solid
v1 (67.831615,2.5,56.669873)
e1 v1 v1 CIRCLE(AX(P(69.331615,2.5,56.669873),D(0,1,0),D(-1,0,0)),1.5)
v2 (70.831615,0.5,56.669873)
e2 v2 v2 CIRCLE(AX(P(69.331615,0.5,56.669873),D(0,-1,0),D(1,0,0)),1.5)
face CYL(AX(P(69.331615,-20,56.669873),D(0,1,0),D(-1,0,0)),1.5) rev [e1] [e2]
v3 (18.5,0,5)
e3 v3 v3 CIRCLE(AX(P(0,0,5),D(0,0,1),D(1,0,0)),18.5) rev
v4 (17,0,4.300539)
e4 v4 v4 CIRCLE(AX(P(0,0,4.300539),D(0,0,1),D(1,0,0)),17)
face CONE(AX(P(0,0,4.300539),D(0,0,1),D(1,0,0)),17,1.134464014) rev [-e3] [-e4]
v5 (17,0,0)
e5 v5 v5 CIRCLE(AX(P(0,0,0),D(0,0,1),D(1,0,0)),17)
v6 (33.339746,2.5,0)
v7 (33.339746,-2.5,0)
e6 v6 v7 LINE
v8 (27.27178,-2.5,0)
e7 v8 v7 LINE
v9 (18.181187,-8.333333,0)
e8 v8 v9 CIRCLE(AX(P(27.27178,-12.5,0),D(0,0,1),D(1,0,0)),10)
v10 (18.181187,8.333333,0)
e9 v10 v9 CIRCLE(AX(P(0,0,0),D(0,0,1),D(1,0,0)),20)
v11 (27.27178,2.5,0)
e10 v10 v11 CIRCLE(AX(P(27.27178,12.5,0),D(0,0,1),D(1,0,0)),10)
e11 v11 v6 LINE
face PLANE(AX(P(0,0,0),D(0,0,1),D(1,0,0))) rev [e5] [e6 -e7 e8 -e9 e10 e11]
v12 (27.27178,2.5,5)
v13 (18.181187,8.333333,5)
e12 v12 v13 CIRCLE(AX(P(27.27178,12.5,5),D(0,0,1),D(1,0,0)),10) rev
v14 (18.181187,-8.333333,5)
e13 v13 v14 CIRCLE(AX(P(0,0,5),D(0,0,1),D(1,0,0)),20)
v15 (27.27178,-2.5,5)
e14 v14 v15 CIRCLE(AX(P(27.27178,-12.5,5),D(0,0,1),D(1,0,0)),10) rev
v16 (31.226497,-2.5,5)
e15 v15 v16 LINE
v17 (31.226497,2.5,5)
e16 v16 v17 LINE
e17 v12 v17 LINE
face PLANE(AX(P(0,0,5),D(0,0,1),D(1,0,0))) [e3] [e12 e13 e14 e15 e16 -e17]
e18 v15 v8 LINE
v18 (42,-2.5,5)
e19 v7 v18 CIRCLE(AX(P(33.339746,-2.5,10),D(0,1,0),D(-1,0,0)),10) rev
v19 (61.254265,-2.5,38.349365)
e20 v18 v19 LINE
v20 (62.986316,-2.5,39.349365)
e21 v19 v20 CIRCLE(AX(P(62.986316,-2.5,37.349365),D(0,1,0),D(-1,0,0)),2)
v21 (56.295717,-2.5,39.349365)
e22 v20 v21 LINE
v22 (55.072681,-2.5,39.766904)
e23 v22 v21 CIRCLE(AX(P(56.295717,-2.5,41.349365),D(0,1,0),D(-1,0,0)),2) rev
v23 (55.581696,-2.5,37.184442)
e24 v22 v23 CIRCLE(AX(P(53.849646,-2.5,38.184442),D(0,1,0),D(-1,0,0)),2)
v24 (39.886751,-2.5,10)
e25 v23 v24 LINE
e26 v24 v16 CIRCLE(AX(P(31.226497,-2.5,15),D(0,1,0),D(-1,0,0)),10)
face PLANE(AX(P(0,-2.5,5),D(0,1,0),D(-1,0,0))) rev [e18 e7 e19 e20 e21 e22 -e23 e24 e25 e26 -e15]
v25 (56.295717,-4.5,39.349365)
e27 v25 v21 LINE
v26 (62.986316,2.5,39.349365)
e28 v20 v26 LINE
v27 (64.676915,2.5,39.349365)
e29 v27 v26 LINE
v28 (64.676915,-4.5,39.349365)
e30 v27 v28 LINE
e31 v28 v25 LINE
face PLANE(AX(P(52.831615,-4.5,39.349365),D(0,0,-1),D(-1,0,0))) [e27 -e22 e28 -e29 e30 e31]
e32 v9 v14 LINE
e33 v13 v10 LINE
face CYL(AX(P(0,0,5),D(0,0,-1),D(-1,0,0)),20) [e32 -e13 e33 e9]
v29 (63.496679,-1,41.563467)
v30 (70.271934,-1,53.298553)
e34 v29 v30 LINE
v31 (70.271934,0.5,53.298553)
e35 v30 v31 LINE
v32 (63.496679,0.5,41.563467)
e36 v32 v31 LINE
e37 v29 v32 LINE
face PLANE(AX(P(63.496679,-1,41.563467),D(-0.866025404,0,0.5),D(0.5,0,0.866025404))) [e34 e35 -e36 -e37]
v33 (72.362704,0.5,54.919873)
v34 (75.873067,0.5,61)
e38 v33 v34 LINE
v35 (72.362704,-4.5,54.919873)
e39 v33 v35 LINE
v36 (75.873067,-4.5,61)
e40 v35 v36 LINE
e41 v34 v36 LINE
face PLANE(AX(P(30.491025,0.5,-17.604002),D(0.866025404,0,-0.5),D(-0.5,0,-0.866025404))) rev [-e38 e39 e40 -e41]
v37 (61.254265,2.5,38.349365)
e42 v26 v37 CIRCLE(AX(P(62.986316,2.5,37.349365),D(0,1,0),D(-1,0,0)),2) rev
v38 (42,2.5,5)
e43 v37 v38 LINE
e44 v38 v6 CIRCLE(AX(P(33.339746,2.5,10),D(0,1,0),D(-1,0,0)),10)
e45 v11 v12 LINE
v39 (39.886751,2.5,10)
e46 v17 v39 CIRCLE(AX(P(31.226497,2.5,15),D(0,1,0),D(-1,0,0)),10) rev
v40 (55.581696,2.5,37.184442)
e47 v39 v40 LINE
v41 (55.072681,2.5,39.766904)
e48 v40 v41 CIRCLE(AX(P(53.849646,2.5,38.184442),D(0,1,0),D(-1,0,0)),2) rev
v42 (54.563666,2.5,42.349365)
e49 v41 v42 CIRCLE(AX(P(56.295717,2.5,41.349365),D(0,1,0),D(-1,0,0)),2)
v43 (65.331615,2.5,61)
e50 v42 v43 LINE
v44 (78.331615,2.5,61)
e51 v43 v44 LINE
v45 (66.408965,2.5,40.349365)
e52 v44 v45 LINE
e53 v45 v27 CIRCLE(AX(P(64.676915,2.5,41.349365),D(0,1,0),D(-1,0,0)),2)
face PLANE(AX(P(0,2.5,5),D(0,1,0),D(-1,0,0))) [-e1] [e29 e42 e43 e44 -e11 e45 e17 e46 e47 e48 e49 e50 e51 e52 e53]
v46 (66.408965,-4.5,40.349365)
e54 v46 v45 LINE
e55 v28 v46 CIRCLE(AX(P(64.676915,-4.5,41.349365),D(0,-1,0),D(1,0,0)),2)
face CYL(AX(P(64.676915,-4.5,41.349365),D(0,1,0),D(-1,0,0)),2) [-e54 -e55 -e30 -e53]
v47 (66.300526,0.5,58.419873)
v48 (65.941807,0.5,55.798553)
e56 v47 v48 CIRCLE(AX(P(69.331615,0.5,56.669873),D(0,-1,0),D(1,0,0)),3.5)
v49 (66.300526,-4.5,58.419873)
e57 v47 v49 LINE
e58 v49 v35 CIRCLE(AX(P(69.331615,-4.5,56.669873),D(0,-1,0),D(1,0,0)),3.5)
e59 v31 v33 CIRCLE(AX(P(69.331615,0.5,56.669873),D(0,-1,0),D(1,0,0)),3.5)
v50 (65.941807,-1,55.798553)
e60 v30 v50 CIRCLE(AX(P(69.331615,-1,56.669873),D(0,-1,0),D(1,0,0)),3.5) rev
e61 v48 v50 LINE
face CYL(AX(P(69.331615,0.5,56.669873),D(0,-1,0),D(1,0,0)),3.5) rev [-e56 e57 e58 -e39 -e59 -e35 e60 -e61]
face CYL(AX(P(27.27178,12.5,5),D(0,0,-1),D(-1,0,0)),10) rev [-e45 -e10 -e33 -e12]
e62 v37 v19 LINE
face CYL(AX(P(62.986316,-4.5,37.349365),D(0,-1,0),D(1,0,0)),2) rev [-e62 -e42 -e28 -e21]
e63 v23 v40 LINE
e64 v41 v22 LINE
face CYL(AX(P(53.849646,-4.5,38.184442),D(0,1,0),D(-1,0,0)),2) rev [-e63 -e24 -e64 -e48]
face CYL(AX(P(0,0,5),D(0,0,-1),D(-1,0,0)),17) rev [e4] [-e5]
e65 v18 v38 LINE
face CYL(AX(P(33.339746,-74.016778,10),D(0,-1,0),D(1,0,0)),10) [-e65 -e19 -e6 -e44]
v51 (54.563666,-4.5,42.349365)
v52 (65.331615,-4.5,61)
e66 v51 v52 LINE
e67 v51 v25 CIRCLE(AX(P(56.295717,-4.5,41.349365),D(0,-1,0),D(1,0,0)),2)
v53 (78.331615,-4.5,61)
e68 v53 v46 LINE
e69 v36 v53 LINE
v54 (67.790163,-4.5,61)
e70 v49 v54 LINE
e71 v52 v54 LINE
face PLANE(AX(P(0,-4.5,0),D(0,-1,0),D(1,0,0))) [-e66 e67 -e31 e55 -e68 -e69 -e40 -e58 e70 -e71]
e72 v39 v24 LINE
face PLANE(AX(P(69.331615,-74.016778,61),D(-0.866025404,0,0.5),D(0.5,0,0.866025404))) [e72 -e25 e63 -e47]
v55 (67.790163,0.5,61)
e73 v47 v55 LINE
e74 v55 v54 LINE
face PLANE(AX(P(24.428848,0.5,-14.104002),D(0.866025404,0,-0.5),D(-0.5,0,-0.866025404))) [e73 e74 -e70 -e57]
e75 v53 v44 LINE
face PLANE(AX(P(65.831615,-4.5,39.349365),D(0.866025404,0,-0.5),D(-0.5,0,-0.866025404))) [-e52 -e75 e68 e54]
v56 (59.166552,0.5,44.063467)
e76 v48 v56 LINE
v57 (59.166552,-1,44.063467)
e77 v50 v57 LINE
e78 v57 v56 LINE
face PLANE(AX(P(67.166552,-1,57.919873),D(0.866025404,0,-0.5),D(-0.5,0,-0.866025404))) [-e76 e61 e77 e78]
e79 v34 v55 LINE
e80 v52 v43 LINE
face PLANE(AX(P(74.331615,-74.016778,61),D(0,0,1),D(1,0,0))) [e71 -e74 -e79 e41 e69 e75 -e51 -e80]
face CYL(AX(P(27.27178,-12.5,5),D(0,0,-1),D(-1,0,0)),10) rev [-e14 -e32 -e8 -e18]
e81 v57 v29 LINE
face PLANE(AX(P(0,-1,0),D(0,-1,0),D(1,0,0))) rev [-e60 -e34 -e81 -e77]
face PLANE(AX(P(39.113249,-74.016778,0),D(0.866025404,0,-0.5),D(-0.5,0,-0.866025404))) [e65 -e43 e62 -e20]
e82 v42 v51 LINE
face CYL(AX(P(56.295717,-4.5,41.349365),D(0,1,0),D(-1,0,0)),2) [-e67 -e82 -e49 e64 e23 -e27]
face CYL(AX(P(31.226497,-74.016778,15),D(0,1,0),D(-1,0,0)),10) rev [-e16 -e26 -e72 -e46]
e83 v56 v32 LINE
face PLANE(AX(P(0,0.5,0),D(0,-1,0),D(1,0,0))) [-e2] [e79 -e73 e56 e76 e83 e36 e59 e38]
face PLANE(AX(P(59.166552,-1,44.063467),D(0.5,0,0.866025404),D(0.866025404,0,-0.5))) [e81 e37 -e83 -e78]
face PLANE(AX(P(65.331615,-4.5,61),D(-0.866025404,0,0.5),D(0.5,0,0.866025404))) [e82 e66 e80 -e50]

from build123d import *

# Parameters (mm, degrees)
BOSS_EXTRUDE1_DEPTH = 5
CHAMFER2_SIZE       = 1.5
CHAMFER2_SIZE2      = 0.699461487
FILLET1_R           = 10
BOSS_EXTRUDE2_DEPTH = 5
BOSS_EXTRUDE3_DEPTH = 7
CUT_EXTRUDE1_DEPTH  = 5
CUT_EXTRUDE2_DEPTH  = 1.5
SKETCH11_R          = 1.5
CUT_EXTRUDE3_DEPTH  = 102.79927269
FILLET2_R           = 10
FILLET3_R           = 2
FILLET4_R           = 2


with BuildPart() as part:
    # Sketch1 → Boss-Extrude1 (new body)
    with BuildSketch(Plane.XY):
        with BuildLine():
            ThreePointArc((16.815171721, -2.5), (-17, 0), (16.815171721, 2.5))
            Line((16.815171721, 2.5), (19.843134833, 2.5))
            ThreePointArc((19.843134833, 2.5), (-20, 0), (19.843134833, -2.5))
            Line((19.843134833, -2.5), (16.815171721, -2.5))
        make_face()
        with BuildLine():
            Line((19.843134833, 2.5), (16.815171721, 2.5))
            ThreePointArc((16.815171721, 2.5), (16.953729962, 1.253411494), (17, 0))
            ThreePointArc((17, 0), (16.953729962, -1.253411494), (16.815171721, -2.5))
            Line((16.815171721, -2.5), (19.843134833, -2.5))
            ThreePointArc((19.843134833, -2.5), (19.960745185, -1.252458251), (20, 0))
            ThreePointArc((20, 0), (19.960745185, 1.252458251), (19.843134833, 2.5))
        make_face()
        with BuildLine():
            Line((37, 2.5), (19.843134833, 2.5))
            ThreePointArc((19.843134833, 2.5), (19.960745185, 1.252458251), (20, 0))
            ThreePointArc((20, 0), (19.960745185, -1.252458251), (19.843134833, -2.5))
            Line((19.843134833, -2.5), (37, -2.5))
            Line((37, -2.5), (37, 2.5))
        make_face()
    extrude(amount=BOSS_EXTRUDE1_DEPTH)

    # Chamfer2
    chamfer2_edges = [part.edges().sort_by_distance(p)[0] for p in [
        (-16.815171721, -2.5, 5),
    ]]
    chamfer2_side = [part.faces().sort_by_distance(p)[0] for p in [
        (-17.503948469, -2.602404061, 5),
    ]]
    chamfer(chamfer2_edges, length=CHAMFER2_SIZE, length2=CHAMFER2_SIZE2, reference=chamfer2_side[0])

    # Fillet1
    fillet1_edges = [part.edges().sort_by_distance(p)[0] for p in [
        (19.843134833, 2.5, 2.5),
        (19.843134833, -2.5, 2.5),
    ]]
    fillet(fillet1_edges, radius=FILLET1_R)

    # Sketch3 → Boss-Extrude2 (add)
    with BuildSketch(Plane(origin=(0, 2.5, 0), x_dir=(1, 0, 0), z_dir=(0, 1, 0))):
        Polygon((39.113248654, 0), (74.331615075, -61), (69.331615075, -61), (37, -5), (37, 0), align=None)
    extrude(amount=-BOSS_EXTRUDE2_DEPTH)

    # Sketch5 → Boss-Extrude3 (add)
    with BuildSketch(Plane(origin=(0, 2.5, 0), x_dir=(1, 0, 0), z_dir=(0, 1, 0))):
        Polygon((65.331615075, -61), (78.331615075, -61), (65.831615075, -39.349364905), (52.831615075, -39.349364905), align=None)
    extrude(amount=-BOSS_EXTRUDE3_DEPTH)

    # Sketch9 → Cut-Extrude1 (cut)
    with BuildSketch(Plane.XZ.offset(4.5)):
        with BuildLine():
            Line((75.873066959, 61), (67.79016319, 61))
            Line((67.79016319, 61), (66.300526161, 58.419872981))
            ThreePointArc((66.300526161, 58.419872981), (67.581615075, 53.638784068), (72.362703988, 54.919872981))
            Line((72.362703988, 54.919872981), (75.873066959, 61))
        make_face()
    extrude(amount=-CUT_EXTRUDE1_DEPTH, mode=Mode.SUBTRACT)

    # Sketch10 → Cut-Extrude2 (cut)
    with BuildSketch(Plane.XZ.offset(-0.5)):
        Polygon((67.166551565, 57.919872981), (71.496678584, 55.419872981), (63.496678584, 41.563466521), (59.166551565, 44.063466521), align=None)
    extrude(amount=CUT_EXTRUDE2_DEPTH, mode=Mode.SUBTRACT)

    # Sketch11 → Cut-Extrude3 (cut, through all)
    with BuildSketch(Plane(origin=(0, 2.5, 0), x_dir=(1, 0, 0), z_dir=(0, 1, 0))):
        with Locations(Location((69.331615075, -56.669872981, 0), (0, 0, 180))):
            Circle(SKETCH11_R)
    extrude(amount=-CUT_EXTRUDE3_DEPTH, mode=Mode.SUBTRACT)

    # Fillet2
    fillet2_edges = [part.edges().sort_by_distance(p)[0] for p in [
        (37, 0, 5),
        (39.113248654, 0, 0),
    ]]
    fillet(fillet2_edges, radius=FILLET2_R)

    # Fillet3
    fillet3_edges = [part.edges().sort_by_distance(p)[0] for p in [
        (52.831615075, -1, 39.349364905),
        (65.831615075, -1, 39.349364905),
    ]]
    fillet(fillet3_edges, radius=FILLET3_R)

    # Fillet4
    # the kernel refuses this fillet: 2 mm, written as the material it adds along each edge
    with BuildSketch(Plane(origin=(61.831615075, 2.5, 39.349364905), x_dir=(1, 0, 0), z_dir=(0, -1, 0))) as fillet4_piece_1:
        with BuildLine():
            CenterArc((FILLET4_R * 0.57735026919, -FILLET4_R), FILLET4_R, 90, 60)
            Line((-FILLET4_R * 0.288675134595, -FILLET4_R * 0.5), (0, 0))
            Line((0, 0), (FILLET4_R * 0.57735026919, 0))
        make_face()
    extrude(amount=5)
    with BuildSketch(Plane(origin=(56.831615075, -2.5, 39.349364905), x_dir=(-0.9729624343176315, 0, 0.2309634200619407), z_dir=(0, 1, 0))) as fillet4_piece_2:
        with BuildLine():
            CenterArc((2.632289796, -1.822151945), FILLET4_R, 114.345531007, 82.300670054)
            Line((0.716106006, -2.395074001), (0.524487627, -2.452366207))
            Line((0.524487627, -2.452366207), (-0.191618379, -0.057292206))
            Line((-0.191618379, -0.057292206), (0.046192684, 0.194592487))
            ThreePointArc((0.046192684, 0.194592487), (0.567601681, 0.070819563), (1.725365119, 0.182215194))
            Line((1.725365119, 0.182215194), (1.807812817, 0))
        make_face()
    extrude(amount=5)


solid = part.part
